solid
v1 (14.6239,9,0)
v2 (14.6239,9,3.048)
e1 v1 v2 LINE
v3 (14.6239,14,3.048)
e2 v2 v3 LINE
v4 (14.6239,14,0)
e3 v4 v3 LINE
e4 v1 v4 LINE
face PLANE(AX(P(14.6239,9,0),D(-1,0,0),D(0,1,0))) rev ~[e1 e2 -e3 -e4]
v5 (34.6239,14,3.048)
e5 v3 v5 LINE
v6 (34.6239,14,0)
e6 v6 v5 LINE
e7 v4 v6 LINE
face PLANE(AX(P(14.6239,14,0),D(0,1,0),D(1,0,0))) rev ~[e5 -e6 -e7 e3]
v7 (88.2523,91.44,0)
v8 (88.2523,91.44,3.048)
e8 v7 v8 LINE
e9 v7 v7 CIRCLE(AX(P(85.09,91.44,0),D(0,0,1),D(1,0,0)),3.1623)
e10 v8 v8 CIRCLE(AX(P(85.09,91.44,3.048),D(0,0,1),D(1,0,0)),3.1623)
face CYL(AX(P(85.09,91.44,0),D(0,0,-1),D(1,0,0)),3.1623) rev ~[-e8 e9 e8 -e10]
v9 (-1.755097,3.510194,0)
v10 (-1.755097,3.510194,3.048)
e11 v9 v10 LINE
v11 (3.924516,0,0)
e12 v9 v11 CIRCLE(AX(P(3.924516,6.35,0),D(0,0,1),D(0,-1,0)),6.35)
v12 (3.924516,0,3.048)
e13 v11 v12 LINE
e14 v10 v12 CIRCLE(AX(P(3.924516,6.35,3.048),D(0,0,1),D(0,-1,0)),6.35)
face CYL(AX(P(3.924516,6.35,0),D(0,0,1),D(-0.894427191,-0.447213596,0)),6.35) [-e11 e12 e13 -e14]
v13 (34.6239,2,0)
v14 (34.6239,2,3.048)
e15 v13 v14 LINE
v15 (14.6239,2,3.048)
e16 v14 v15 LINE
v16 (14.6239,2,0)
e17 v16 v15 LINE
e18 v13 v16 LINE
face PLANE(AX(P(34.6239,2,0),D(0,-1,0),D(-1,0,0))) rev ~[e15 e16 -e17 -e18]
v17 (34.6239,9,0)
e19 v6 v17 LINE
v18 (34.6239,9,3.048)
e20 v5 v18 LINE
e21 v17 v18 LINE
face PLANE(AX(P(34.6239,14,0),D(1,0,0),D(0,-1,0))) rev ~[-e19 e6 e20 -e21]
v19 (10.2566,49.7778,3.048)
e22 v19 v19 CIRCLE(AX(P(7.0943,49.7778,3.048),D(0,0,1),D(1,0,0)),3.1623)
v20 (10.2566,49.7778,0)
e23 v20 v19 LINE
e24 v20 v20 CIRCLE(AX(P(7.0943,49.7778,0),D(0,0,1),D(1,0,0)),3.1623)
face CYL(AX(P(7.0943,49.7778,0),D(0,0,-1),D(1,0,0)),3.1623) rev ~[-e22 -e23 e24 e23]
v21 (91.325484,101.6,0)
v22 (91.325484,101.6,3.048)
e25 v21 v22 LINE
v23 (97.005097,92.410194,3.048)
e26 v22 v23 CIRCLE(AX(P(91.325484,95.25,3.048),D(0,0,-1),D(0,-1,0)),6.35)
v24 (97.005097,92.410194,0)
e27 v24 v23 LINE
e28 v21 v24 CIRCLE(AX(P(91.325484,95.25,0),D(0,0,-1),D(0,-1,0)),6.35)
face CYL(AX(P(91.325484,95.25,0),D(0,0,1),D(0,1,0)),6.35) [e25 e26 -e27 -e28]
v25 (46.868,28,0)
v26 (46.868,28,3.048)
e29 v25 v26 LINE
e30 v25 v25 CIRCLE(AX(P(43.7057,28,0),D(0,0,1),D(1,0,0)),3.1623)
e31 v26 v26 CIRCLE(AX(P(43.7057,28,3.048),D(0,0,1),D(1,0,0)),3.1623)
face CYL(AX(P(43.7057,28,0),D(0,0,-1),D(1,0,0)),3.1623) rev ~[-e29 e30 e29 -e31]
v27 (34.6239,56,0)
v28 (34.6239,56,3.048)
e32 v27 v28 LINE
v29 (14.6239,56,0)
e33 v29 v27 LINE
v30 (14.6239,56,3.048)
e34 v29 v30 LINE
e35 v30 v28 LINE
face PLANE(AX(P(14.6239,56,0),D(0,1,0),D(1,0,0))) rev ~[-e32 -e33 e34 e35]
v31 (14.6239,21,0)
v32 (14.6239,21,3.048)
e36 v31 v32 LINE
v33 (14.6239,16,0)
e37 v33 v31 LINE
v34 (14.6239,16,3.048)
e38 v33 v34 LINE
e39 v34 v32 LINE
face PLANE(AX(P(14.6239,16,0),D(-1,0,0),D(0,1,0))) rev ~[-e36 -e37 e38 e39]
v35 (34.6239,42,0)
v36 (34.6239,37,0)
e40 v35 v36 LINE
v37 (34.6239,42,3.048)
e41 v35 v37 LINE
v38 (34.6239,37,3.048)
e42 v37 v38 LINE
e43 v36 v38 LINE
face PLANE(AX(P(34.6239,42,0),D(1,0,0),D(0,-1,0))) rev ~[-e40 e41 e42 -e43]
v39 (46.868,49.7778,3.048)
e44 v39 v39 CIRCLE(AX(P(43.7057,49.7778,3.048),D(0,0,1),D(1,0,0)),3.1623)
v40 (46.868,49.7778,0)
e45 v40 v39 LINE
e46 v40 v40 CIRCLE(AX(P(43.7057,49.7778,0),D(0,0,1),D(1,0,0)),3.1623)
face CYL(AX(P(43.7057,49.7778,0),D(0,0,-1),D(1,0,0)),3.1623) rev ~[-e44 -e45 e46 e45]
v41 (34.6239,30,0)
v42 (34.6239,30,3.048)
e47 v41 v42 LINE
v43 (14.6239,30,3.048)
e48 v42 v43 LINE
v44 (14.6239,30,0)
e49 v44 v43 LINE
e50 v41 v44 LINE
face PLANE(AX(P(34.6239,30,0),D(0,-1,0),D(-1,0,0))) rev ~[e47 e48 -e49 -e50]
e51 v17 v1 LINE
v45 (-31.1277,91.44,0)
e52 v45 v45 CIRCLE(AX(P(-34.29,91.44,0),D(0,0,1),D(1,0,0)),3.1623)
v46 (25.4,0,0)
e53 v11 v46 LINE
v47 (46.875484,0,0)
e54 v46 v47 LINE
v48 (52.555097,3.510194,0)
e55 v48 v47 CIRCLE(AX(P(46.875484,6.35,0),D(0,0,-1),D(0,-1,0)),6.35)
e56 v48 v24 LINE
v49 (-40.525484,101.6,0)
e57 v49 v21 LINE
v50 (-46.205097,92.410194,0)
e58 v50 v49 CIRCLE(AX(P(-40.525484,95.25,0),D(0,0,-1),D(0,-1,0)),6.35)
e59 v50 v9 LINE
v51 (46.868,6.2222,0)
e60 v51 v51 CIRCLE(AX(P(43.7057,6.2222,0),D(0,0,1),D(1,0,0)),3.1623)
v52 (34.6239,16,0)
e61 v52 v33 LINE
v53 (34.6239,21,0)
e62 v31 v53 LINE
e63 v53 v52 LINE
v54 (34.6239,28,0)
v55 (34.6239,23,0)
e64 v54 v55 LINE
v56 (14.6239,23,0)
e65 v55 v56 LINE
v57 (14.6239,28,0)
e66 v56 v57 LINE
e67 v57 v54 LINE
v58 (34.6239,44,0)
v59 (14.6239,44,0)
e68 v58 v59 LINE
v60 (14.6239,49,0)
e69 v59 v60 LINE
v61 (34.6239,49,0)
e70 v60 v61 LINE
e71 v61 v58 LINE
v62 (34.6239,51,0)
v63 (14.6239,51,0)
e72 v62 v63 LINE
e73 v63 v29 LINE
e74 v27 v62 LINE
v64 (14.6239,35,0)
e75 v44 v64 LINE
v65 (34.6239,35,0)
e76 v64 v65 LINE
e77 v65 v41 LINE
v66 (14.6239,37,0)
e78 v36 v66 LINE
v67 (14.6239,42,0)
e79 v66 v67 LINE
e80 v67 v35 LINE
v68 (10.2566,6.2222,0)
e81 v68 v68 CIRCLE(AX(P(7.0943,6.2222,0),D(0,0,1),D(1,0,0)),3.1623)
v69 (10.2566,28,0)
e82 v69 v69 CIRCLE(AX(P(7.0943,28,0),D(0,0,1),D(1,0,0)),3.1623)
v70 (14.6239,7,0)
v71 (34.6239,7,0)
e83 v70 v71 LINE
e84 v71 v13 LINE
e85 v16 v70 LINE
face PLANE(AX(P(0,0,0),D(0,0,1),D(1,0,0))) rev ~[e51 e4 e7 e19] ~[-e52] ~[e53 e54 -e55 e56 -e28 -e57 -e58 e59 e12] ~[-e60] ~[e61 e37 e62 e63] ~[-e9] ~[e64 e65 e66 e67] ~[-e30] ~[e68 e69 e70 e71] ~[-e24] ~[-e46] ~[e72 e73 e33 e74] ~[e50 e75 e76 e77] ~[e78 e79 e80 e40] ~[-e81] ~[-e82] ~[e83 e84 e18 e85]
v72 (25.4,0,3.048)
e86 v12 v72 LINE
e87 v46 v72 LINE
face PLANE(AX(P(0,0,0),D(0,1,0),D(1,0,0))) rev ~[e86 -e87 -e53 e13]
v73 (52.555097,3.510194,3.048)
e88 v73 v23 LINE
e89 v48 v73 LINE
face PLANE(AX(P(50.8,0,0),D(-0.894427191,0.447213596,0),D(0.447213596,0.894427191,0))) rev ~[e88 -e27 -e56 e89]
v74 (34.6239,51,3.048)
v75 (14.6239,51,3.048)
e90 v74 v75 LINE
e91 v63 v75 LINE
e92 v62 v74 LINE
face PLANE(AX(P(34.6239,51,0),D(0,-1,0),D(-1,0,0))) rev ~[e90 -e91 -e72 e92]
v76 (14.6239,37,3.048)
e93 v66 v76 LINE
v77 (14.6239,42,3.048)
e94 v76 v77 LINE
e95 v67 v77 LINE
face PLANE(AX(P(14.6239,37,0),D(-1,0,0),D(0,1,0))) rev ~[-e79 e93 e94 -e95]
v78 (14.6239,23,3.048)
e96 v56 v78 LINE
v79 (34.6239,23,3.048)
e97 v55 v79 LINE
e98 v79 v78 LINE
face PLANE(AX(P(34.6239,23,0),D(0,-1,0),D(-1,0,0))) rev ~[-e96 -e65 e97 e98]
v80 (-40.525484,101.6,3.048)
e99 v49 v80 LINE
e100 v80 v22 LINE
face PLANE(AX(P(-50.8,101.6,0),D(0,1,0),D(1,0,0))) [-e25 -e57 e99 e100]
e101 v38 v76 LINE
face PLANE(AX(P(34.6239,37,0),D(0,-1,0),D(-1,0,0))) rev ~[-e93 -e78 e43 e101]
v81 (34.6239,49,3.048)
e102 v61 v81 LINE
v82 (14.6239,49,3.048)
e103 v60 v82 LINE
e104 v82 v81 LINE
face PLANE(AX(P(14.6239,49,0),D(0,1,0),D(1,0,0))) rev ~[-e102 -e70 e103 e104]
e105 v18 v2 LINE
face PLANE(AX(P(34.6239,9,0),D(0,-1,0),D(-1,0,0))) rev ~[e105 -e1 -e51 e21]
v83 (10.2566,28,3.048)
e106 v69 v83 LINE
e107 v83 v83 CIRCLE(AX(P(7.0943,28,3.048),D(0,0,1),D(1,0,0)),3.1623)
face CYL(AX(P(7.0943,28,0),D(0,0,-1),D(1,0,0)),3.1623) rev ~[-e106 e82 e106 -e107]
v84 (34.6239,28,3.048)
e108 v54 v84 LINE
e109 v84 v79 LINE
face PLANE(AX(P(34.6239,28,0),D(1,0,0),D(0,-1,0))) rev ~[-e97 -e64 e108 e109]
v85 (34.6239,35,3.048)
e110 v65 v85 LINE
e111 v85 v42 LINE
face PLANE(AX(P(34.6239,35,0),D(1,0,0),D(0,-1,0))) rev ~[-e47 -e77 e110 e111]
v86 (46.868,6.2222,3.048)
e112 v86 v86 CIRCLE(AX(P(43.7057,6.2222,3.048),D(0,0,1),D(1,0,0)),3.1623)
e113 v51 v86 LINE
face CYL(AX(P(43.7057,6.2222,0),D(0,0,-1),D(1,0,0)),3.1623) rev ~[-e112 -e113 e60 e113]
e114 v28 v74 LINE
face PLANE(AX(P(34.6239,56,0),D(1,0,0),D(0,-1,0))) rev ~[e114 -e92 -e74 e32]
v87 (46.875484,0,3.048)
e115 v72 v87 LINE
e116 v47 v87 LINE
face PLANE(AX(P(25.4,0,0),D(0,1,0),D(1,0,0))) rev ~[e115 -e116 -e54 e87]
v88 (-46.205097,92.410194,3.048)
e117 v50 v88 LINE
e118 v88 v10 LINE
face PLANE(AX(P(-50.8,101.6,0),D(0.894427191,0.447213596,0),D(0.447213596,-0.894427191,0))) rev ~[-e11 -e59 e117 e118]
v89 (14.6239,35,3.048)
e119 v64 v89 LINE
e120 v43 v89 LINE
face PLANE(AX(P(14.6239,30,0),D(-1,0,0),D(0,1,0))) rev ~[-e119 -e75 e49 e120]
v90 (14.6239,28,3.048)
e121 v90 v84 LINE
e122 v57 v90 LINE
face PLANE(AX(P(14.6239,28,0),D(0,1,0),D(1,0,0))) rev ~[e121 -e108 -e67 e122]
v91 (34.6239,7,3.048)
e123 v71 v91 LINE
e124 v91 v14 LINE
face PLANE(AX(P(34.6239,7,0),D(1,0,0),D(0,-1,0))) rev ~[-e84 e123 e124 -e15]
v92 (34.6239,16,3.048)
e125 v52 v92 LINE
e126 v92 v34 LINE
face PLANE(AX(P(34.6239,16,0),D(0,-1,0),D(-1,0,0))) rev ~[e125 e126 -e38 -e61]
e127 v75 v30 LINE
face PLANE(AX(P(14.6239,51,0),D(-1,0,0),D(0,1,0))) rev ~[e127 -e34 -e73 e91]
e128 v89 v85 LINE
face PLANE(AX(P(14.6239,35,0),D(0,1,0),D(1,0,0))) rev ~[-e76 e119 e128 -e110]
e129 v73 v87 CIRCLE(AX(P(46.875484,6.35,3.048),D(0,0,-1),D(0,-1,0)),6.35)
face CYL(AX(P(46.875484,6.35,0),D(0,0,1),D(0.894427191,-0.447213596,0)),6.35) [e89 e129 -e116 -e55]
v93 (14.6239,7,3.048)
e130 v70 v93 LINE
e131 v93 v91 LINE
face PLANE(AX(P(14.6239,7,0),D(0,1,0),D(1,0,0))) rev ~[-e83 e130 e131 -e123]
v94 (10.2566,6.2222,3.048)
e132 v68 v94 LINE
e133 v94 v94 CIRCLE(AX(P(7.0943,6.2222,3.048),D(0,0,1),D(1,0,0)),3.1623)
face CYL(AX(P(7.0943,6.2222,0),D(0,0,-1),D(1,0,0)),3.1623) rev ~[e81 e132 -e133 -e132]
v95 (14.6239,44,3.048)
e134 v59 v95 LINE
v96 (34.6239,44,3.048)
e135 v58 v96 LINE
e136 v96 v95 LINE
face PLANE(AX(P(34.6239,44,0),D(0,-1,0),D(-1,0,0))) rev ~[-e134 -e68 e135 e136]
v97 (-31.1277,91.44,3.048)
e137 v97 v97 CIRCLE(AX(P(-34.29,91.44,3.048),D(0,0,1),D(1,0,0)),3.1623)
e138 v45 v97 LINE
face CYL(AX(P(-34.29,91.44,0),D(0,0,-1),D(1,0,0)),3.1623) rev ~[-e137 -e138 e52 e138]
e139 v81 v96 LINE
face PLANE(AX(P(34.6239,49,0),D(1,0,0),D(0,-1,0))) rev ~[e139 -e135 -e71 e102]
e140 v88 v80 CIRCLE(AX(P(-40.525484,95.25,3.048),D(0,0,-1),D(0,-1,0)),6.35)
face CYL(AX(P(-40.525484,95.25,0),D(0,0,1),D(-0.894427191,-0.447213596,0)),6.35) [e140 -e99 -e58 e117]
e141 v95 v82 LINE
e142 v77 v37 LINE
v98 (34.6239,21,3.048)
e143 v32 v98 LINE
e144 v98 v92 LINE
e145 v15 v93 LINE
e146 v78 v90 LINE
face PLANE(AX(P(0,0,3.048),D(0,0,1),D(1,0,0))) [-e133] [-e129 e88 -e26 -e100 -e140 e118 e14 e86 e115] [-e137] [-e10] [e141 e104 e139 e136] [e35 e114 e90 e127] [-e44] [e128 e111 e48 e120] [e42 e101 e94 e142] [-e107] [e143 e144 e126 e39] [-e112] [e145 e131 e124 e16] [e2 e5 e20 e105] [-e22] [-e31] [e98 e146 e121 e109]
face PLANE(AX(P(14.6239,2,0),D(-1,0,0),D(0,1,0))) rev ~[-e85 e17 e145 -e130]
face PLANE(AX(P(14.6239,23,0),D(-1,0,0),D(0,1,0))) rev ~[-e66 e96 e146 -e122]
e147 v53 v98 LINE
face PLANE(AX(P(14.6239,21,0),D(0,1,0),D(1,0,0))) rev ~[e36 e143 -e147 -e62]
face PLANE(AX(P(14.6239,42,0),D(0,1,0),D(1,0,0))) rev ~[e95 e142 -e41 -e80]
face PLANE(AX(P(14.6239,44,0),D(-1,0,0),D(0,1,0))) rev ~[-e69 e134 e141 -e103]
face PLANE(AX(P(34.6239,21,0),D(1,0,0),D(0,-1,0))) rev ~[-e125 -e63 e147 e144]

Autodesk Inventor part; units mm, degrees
ref_plane "YZ Plane" through (0, 0, 0) normal (1, 0, 0) x (0, 1, 0)
ref_plane "XZ Plane" through (0, 0, 0) normal (0, 1, 0) x (-1, 0, 0)
ref_plane "XY Plane" through (0, 0, 0) normal (0, 0, 1) x (1, 0, 0)
sketch "Sketch1" plane through (0, 0, 0) normal (0, 0, 1) x (1, 0, 0)
  line L0 (0, 0) -> (50.8, 0)
  line L1 (-50.8, 101.6) -> (101.6, 101.6)
  line L2 (50.8, 0) -> (101.6, 101.6)
  line L3 (-50.8, 101.6) -> (0, 0)
  line L4 (14.6239, 7) -> (34.6239, 7)
  line L5 (34.6239, 7) -> (34.6239, 2)
  line L6 (34.6239, 2) -> (14.6239, 2)
  line L7 (14.6239, 2) -> (14.6239, 7)
  line L8 (50.8, 0) -> (50.8, 62.4863)
  line L9 (14.6239, 14) -> (34.6239, 14)
  line L10 (34.6239, 14) -> (34.6239, 9)
  line L11 (34.6239, 9) -> (14.6239, 9)
  line L12 (14.6239, 9) -> (14.6239, 14)
  line L13 (14.6239, 21) -> (34.6239, 21)
  line L14 (34.6239, 21) -> (34.6239, 16)
  line L15 (34.6239, 16) -> (14.6239, 16)
  line L16 (14.6239, 16) -> (14.6239, 21)
  line L17 (14.6239, 28) -> (34.6239, 28)
  line L18 (34.6239, 28) -> (34.6239, 23)
  line L19 (34.6239, 23) -> (14.6239, 23)
  line L20 (14.6239, 23) -> (14.6239, 28)
  line L21 (14.6239, 35) -> (34.6239, 35)
  line L22 (34.6239, 35) -> (34.6239, 30)
  line L23 (34.6239, 30) -> (14.6239, 30)
  line L24 (14.6239, 30) -> (14.6239, 35)
  line L25 (14.6239, 42) -> (34.6239, 42)
  line L26 (34.6239, 42) -> (34.6239, 37)
  line L27 (34.6239, 37) -> (14.6239, 37)
  line L28 (14.6239, 37) -> (14.6239, 42)
  circle A0 centre (43.7057, 6.2222) radius 3.1623
  circle A1 centre (43.7057, 28) radius 3.1623
  circle A2 centre (43.7057, 49.7778) radius 3.1623
  line L29 (25.4, 0) -> (25.4, -15.6085)
  circle A3 centre (7.0943, 6.2222) radius 3.1623
  circle A4 centre (7.0943, 28) radius 3.1623
  circle A5 centre (7.0943, 49.7778) radius 3.1623
  line L30 (14.6239, 49) -> (34.6239, 49)
  line L31 (34.6239, 49) -> (34.6239, 44)
  line L32 (34.6239, 44) -> (14.6239, 44)
  line L33 (14.6239, 44) -> (14.6239, 49)
  line L34 (14.6239, 56) -> (34.6239, 56)
  line L35 (34.6239, 56) -> (34.6239, 51)
  line L36 (34.6239, 51) -> (14.6239, 51)
  line L37 (14.6239, 51) -> (14.6239, 56)
  circle A6 centre (-34.29, 91.44) radius 3.1623
  circle A7 centre (85.09, 91.44) radius 3.1623
  dimension "d0" = 50.8
  dimension "d1" = 152.4
  dimension "d2" = 101.6
  dimension "d5" = 50.8
  dimension "d6" = 20
  dimension "d7" = 5
  dimension "d8" = 2
  dimension "d11" = 7
  dimension "d16" = 6.3246
  dimension "d19" = 6.3246
  dimension "d21" = 6.3246
  dimension "d26" = 14
  dimension "d31" = 56
  dimension "d35" = 6.2222
  dimension "d36" = 6.2222
  dimension "d37" = 28
  dimension "d38" = 6.3246
  dimension "d39" = 6.3246
  dimension "d40" = 34.29
  dimension "d41" = 34.29
  dimension "d42" = 10.16
  dimension "d43" = 10.16
  dimension "d46" = 9.0818
extrude "Plate1" add sketch "Sketch1" along normal blind 3.048
fillet "Corner Round1" radius 6.35 4 edges at (101.6, 101.6, 1.524) (-50.8, 101.6, 1.524) (50.8, 0, 1.524) (0, 0, 1.524)
equation "\"d19\" = d16"
equation "\"d21\" = d19"
equation "\"d35\" = 0.111111 * d31"
equation "\"d36\" = d35"
equation "\"d37\" = 0.5 * d31"
equation "\"d41\" = d40"
equation "\"d43\" = d42"
equation "\"BendRadius\" = Thickness"
equation "\"BendReliefWidth\" = Thickness"
equation "\"BendReliefDepth\" = 0.5 * Thickness"
equation "\"CornerReliefSize\" = 4 * Thickness"
equation "\"MinimumRemnant\" = 2 * Thickness"
equation "\"TransitionRadius\" = BendRadius"
equation "\"JacobiRadiusSize\" = BendRadius"
equation "\"GapSize\" = Thickness"
equation "\"d44\" = BendRadius"
equation "\"Thickness\" = 3.048"
properties part number "Belt plate base"
